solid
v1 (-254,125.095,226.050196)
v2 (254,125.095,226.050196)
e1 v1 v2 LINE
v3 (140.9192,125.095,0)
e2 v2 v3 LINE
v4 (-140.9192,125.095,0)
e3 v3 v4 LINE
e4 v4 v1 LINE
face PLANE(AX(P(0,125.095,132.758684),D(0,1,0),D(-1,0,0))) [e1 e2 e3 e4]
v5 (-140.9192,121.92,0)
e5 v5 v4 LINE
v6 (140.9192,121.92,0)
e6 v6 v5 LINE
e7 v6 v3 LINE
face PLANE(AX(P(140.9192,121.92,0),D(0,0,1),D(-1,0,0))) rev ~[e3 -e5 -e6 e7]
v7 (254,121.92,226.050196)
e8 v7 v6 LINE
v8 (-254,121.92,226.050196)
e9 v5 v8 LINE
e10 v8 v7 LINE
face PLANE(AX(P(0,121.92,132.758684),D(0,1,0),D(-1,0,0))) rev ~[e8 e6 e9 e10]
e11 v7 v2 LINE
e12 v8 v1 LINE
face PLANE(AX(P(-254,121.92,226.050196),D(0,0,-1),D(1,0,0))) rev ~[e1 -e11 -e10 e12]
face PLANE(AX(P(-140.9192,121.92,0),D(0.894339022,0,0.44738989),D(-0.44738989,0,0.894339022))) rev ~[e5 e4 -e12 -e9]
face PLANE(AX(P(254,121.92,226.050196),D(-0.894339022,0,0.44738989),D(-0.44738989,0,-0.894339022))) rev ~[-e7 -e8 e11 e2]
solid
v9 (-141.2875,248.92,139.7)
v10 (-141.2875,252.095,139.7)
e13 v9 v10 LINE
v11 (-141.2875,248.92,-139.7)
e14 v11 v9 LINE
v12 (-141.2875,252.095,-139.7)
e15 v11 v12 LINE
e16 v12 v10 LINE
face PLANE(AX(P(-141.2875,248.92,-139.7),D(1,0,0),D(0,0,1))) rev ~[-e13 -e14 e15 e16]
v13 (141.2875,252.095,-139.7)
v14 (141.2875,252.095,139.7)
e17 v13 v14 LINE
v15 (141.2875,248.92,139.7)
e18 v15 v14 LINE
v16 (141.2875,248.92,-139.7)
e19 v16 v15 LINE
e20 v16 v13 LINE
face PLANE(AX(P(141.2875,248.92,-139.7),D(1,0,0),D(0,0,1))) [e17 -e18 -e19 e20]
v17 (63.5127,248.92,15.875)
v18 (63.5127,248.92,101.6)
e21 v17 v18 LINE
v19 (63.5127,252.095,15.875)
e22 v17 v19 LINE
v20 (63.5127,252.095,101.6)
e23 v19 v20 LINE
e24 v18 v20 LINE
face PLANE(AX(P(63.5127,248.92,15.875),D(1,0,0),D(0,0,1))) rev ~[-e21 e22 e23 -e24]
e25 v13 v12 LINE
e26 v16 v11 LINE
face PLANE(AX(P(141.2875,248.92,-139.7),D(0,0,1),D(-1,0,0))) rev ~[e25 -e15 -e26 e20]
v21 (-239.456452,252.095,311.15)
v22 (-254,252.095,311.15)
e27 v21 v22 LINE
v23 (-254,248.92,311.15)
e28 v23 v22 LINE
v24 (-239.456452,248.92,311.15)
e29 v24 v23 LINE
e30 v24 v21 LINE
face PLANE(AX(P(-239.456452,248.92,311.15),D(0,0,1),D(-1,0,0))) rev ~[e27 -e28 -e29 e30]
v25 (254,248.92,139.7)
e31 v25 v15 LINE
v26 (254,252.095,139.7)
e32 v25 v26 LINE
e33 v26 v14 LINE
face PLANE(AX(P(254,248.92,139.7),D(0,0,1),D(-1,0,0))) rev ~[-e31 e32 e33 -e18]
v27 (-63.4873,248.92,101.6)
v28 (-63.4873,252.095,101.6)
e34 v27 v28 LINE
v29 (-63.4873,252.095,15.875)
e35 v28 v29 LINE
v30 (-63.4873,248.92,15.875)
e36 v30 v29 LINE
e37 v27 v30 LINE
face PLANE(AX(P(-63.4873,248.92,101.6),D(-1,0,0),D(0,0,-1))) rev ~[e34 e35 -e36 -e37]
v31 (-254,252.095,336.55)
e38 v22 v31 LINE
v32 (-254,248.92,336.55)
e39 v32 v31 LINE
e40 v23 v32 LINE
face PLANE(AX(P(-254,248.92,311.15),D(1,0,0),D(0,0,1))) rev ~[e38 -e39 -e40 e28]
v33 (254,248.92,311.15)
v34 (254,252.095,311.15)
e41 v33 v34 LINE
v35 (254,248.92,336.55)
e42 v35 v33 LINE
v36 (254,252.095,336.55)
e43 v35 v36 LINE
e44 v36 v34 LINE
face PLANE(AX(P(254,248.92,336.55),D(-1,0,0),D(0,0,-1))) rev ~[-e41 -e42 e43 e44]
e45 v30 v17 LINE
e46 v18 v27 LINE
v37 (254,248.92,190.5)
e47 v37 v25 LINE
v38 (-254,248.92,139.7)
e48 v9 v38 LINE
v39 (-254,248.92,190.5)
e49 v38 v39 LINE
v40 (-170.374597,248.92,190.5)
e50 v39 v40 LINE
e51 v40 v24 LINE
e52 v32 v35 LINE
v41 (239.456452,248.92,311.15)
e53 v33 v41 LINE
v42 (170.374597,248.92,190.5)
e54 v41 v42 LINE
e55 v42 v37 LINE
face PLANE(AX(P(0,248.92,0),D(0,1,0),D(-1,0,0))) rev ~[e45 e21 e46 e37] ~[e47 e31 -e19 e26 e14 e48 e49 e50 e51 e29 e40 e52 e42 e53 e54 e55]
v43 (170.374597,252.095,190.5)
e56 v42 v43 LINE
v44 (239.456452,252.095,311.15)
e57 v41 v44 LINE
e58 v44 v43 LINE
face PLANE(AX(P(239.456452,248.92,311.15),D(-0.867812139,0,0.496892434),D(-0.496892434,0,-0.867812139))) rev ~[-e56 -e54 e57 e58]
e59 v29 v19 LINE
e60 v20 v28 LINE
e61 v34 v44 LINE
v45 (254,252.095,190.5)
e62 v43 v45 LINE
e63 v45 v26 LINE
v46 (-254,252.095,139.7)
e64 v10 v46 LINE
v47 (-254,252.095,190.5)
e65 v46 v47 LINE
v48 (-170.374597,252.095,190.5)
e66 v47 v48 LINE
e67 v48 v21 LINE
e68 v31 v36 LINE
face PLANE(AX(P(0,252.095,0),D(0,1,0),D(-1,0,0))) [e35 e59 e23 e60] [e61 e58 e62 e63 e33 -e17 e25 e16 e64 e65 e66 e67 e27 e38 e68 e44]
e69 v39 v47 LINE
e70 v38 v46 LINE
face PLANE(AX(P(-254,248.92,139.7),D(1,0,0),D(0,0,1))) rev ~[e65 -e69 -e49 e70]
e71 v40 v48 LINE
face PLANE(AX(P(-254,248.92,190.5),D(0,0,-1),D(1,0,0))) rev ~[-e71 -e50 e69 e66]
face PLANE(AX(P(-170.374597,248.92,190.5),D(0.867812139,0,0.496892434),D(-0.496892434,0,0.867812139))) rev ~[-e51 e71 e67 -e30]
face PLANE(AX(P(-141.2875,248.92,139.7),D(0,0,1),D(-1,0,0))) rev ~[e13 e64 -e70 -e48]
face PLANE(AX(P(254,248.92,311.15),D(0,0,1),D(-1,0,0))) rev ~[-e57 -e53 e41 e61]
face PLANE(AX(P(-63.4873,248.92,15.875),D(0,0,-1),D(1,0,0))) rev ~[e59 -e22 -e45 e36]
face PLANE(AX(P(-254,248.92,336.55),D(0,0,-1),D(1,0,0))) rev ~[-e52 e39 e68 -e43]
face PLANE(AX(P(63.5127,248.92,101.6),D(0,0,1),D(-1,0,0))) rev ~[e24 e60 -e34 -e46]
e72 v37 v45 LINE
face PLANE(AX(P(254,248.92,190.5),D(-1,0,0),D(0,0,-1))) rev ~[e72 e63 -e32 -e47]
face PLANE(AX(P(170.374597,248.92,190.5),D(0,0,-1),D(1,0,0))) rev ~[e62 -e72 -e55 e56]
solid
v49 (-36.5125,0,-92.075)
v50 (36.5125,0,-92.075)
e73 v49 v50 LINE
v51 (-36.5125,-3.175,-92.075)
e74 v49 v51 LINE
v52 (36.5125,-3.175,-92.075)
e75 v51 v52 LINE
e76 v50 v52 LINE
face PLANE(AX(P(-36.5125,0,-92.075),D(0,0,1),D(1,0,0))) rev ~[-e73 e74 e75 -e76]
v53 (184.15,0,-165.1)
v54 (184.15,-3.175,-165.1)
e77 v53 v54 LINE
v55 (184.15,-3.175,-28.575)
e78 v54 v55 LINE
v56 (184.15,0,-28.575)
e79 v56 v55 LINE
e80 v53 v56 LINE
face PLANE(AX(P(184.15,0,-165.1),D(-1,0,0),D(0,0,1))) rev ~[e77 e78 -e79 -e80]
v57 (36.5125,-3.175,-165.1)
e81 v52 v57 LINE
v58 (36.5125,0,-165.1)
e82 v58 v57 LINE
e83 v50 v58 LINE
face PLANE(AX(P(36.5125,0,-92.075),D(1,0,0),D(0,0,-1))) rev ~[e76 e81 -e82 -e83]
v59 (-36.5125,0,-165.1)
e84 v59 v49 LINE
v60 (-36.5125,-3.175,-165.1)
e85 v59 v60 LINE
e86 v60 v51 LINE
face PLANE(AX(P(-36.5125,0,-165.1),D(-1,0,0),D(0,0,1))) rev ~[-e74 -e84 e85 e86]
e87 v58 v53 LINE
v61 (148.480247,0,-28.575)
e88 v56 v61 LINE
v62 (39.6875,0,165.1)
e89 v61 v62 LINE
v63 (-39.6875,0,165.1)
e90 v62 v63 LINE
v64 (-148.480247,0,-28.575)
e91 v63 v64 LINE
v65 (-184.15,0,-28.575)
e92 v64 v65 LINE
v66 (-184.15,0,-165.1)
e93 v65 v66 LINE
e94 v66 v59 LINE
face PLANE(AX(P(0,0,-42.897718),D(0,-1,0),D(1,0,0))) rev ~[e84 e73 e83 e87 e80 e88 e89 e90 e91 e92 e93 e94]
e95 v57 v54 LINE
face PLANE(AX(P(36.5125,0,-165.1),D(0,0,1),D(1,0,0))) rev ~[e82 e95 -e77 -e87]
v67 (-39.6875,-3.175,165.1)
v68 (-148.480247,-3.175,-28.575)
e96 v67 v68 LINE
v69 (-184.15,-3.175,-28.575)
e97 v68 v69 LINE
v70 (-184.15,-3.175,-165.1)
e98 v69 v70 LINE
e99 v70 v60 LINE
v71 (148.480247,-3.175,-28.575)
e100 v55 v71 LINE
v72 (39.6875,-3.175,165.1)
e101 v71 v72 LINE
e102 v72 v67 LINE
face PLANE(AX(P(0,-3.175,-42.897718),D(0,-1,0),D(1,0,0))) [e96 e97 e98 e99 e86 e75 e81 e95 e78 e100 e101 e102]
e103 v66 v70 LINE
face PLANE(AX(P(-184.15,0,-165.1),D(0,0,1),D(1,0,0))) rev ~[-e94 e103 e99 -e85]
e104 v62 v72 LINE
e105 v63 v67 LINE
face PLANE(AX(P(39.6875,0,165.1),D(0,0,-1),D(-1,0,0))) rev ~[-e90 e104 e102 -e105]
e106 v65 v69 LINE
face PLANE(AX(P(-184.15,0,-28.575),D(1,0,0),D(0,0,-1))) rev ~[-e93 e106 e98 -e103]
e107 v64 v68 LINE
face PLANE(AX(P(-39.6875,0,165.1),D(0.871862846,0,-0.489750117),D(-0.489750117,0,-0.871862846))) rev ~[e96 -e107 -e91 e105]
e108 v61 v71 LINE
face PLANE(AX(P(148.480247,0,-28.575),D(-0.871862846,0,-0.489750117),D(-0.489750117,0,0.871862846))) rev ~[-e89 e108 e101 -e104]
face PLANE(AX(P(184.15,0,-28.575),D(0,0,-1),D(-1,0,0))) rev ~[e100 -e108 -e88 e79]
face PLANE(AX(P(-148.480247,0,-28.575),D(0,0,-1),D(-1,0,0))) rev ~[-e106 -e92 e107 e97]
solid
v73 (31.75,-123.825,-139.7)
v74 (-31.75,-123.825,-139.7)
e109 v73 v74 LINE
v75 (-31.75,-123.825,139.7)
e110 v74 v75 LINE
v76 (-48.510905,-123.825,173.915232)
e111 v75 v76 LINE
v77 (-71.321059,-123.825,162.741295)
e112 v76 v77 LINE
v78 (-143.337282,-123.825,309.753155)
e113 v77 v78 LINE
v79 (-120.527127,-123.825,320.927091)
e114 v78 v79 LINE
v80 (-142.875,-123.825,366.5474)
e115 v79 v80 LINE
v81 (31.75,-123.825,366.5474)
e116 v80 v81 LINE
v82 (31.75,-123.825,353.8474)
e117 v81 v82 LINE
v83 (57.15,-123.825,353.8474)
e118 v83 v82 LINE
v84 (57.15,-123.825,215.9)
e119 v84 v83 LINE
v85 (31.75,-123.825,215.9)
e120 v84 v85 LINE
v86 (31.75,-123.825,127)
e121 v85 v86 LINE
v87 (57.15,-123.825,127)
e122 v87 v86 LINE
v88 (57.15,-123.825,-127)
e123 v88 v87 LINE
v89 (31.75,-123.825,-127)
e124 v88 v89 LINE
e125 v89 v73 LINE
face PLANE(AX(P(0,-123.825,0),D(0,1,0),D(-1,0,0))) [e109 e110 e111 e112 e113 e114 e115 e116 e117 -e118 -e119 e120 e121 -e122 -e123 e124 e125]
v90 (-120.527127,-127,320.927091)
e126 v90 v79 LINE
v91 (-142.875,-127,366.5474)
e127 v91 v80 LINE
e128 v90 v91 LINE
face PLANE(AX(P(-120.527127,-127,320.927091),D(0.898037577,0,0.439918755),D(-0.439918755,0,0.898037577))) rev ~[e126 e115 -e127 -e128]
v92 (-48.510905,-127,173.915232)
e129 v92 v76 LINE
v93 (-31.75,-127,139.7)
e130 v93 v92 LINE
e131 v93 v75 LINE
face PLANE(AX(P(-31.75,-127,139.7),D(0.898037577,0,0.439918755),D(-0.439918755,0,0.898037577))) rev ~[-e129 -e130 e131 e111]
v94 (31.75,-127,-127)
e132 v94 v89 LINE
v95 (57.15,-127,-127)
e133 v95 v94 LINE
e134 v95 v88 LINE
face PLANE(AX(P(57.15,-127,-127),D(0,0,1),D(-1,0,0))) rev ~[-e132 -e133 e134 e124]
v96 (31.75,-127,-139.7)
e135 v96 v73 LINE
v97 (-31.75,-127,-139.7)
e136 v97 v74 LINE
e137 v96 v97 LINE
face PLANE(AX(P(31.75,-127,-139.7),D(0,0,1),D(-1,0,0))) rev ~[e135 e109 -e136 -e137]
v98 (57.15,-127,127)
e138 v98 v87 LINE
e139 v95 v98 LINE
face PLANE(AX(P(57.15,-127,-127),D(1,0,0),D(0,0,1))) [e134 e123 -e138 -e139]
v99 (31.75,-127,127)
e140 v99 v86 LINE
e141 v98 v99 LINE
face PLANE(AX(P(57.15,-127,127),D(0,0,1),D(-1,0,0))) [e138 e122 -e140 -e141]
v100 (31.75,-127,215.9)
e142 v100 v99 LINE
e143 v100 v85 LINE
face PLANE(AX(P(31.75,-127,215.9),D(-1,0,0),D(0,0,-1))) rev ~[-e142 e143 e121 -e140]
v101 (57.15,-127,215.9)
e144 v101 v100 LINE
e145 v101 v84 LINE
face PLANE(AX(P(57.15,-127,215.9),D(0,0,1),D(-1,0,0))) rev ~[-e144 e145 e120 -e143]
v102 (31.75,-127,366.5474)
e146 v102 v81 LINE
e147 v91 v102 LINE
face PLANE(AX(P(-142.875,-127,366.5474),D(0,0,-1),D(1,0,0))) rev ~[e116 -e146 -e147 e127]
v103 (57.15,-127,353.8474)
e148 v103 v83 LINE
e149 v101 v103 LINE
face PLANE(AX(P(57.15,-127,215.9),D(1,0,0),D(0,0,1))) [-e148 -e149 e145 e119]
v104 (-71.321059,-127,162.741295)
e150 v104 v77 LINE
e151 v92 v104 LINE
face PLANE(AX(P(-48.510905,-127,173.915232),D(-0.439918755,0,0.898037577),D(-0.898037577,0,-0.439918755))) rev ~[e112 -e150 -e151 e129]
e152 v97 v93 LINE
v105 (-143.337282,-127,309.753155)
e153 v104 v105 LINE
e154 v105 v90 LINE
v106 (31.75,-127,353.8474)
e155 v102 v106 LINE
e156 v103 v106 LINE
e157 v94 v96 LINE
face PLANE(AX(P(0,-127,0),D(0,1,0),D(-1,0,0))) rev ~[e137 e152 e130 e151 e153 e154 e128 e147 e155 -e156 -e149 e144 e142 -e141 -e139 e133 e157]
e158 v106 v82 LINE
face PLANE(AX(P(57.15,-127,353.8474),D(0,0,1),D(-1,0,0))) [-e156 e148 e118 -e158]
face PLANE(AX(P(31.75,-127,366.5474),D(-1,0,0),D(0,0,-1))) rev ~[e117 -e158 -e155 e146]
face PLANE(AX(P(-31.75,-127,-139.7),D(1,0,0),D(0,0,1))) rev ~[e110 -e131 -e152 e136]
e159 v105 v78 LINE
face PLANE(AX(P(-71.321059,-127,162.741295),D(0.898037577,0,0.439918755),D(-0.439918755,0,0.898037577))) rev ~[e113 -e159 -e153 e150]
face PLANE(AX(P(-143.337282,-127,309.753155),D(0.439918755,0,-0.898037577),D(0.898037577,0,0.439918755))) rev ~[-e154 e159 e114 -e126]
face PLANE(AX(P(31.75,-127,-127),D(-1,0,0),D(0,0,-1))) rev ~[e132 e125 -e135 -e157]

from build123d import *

# Parameters (mm, degrees)
F1_DEPTH  = 3.175
F3_W      = 25.4
F3_H      = 254
F3_H_2    = 137.9474
F4_DEPTH  = 3.175
F7_DEPTH  = 3.175
F9_W      = 282.575
F9_H      = 279.4
F10_DEPTH = 3.175


# Not quite as in the source:
# - a length typed as a fraction of an inch, garbled in the dataset ("3 / 203.2 mm" for 3/8 in), is restored


with BuildPart() as f1:
    # F0 (on Front) → F1 (new body)
    with BuildSketch(Plane.XZ):
        Polygon((36.5125, 165.1), (-36.5125, 165.1), (-39.6875, 165.1), (-148.4802469136, -28.575), (-184.15, -28.575), (-184.15, -92.075), (-184.15, -165.1), (-36.5125, -165.1), (-36.5125, -92.075), (36.5125, -92.075), (36.5125, -165.1), (184.15, -165.1), (184.15, -92.075), (184.15, -28.575), (148.4802469136, -28.575), (39.6875, 165.1), align=None)
    extrude(amount=F1_DEPTH)


with BuildPart() as f4:
    # F3 (on offset) → F4 (new body)
    with BuildSketch(Plane(origin=(0, -127, 0), x_dir=(-1, 0, 0), z_dir=(0, 1, 0))):
        Polygon((31.75, -139.7), (31.75, 139.7), (-31.75, 139.7), (-31.75, 127), (-31.75, -127), (-31.75, -139.7), align=None)
        Polygon((-31.75, 139.7), (31.75, 139.7), (48.5109045543, 173.9152316742), (120.5271272609, 320.927091101), (142.875, 366.5474), (-31.75, 366.5474), (-31.75, 353.8474), (-31.75, 215.9), align=None)
        Polygon((120.5271272609, 320.927091101), (48.5109045543, 173.9152316742), (71.3210590038, 162.7412953047), (143.3372817104, 309.7531547315), align=None)
        with Locations((-44.45, 0)):
            Rectangle(F3_W, F3_H)
        with Locations((-44.45, 284.8737)):
            Rectangle(F3_W, F3_H_2)
    extrude(amount=F4_DEPTH)


with BuildPart() as f7:
    # F6 (on offset) → F7 (new body)
    with BuildSketch(Plane(origin=(0, 121.92, 0), x_dir=(-1, 0, 0), z_dir=(0, 1, 0))):
        Polygon((254, 226.0501956), (0, 226.0501956), (-254, 226.0501956), (-140.9192, 0), (0, 0), (140.9192, 0), align=None)
    extrude(amount=F7_DEPTH)


with BuildPart() as f10:
    # F9 (on offset) → F10 (new body)
    with BuildSketch(Plane(origin=(0, 248.92, 0), x_dir=(-1, 0, 0), z_dir=(0, 1, 0))):
        Rectangle(F9_W, F9_H)
        Polygon((-0.0127, 15.875), (-63.5127, 15.875), (-63.5127, 101.6), (-0.0127, 101.6), (63.4873, 101.6), (63.4873, 15.875), align=None, mode=Mode.SUBTRACT)
        Polygon((-170.3745967742, 190.5), (-141.2875, 139.7), (141.2875, 139.7), (170.3745967742, 190.5), (239.4564516129, 311.15), (254, 336.55), (-254, 336.55), (-239.4564516129, 311.15), align=None)
        Polygon((-254, 139.7), (-141.2875, 139.7), (-170.3745967742, 190.5), (-254, 190.5), align=None)
        Polygon((170.3745967742, 190.5), (141.2875, 139.7), (254, 139.7), (254, 190.5), align=None)
        Polygon((254, 336.55), (239.4564516129, 311.15), (254, 311.15), align=None)
        Polygon((-254, 311.15), (-239.4564516129, 311.15), (-254, 336.55), align=None)
    extrude(amount=F10_DEPTH)


solid = Compound([f1.part, f4.part, f7.part, f10.part])
